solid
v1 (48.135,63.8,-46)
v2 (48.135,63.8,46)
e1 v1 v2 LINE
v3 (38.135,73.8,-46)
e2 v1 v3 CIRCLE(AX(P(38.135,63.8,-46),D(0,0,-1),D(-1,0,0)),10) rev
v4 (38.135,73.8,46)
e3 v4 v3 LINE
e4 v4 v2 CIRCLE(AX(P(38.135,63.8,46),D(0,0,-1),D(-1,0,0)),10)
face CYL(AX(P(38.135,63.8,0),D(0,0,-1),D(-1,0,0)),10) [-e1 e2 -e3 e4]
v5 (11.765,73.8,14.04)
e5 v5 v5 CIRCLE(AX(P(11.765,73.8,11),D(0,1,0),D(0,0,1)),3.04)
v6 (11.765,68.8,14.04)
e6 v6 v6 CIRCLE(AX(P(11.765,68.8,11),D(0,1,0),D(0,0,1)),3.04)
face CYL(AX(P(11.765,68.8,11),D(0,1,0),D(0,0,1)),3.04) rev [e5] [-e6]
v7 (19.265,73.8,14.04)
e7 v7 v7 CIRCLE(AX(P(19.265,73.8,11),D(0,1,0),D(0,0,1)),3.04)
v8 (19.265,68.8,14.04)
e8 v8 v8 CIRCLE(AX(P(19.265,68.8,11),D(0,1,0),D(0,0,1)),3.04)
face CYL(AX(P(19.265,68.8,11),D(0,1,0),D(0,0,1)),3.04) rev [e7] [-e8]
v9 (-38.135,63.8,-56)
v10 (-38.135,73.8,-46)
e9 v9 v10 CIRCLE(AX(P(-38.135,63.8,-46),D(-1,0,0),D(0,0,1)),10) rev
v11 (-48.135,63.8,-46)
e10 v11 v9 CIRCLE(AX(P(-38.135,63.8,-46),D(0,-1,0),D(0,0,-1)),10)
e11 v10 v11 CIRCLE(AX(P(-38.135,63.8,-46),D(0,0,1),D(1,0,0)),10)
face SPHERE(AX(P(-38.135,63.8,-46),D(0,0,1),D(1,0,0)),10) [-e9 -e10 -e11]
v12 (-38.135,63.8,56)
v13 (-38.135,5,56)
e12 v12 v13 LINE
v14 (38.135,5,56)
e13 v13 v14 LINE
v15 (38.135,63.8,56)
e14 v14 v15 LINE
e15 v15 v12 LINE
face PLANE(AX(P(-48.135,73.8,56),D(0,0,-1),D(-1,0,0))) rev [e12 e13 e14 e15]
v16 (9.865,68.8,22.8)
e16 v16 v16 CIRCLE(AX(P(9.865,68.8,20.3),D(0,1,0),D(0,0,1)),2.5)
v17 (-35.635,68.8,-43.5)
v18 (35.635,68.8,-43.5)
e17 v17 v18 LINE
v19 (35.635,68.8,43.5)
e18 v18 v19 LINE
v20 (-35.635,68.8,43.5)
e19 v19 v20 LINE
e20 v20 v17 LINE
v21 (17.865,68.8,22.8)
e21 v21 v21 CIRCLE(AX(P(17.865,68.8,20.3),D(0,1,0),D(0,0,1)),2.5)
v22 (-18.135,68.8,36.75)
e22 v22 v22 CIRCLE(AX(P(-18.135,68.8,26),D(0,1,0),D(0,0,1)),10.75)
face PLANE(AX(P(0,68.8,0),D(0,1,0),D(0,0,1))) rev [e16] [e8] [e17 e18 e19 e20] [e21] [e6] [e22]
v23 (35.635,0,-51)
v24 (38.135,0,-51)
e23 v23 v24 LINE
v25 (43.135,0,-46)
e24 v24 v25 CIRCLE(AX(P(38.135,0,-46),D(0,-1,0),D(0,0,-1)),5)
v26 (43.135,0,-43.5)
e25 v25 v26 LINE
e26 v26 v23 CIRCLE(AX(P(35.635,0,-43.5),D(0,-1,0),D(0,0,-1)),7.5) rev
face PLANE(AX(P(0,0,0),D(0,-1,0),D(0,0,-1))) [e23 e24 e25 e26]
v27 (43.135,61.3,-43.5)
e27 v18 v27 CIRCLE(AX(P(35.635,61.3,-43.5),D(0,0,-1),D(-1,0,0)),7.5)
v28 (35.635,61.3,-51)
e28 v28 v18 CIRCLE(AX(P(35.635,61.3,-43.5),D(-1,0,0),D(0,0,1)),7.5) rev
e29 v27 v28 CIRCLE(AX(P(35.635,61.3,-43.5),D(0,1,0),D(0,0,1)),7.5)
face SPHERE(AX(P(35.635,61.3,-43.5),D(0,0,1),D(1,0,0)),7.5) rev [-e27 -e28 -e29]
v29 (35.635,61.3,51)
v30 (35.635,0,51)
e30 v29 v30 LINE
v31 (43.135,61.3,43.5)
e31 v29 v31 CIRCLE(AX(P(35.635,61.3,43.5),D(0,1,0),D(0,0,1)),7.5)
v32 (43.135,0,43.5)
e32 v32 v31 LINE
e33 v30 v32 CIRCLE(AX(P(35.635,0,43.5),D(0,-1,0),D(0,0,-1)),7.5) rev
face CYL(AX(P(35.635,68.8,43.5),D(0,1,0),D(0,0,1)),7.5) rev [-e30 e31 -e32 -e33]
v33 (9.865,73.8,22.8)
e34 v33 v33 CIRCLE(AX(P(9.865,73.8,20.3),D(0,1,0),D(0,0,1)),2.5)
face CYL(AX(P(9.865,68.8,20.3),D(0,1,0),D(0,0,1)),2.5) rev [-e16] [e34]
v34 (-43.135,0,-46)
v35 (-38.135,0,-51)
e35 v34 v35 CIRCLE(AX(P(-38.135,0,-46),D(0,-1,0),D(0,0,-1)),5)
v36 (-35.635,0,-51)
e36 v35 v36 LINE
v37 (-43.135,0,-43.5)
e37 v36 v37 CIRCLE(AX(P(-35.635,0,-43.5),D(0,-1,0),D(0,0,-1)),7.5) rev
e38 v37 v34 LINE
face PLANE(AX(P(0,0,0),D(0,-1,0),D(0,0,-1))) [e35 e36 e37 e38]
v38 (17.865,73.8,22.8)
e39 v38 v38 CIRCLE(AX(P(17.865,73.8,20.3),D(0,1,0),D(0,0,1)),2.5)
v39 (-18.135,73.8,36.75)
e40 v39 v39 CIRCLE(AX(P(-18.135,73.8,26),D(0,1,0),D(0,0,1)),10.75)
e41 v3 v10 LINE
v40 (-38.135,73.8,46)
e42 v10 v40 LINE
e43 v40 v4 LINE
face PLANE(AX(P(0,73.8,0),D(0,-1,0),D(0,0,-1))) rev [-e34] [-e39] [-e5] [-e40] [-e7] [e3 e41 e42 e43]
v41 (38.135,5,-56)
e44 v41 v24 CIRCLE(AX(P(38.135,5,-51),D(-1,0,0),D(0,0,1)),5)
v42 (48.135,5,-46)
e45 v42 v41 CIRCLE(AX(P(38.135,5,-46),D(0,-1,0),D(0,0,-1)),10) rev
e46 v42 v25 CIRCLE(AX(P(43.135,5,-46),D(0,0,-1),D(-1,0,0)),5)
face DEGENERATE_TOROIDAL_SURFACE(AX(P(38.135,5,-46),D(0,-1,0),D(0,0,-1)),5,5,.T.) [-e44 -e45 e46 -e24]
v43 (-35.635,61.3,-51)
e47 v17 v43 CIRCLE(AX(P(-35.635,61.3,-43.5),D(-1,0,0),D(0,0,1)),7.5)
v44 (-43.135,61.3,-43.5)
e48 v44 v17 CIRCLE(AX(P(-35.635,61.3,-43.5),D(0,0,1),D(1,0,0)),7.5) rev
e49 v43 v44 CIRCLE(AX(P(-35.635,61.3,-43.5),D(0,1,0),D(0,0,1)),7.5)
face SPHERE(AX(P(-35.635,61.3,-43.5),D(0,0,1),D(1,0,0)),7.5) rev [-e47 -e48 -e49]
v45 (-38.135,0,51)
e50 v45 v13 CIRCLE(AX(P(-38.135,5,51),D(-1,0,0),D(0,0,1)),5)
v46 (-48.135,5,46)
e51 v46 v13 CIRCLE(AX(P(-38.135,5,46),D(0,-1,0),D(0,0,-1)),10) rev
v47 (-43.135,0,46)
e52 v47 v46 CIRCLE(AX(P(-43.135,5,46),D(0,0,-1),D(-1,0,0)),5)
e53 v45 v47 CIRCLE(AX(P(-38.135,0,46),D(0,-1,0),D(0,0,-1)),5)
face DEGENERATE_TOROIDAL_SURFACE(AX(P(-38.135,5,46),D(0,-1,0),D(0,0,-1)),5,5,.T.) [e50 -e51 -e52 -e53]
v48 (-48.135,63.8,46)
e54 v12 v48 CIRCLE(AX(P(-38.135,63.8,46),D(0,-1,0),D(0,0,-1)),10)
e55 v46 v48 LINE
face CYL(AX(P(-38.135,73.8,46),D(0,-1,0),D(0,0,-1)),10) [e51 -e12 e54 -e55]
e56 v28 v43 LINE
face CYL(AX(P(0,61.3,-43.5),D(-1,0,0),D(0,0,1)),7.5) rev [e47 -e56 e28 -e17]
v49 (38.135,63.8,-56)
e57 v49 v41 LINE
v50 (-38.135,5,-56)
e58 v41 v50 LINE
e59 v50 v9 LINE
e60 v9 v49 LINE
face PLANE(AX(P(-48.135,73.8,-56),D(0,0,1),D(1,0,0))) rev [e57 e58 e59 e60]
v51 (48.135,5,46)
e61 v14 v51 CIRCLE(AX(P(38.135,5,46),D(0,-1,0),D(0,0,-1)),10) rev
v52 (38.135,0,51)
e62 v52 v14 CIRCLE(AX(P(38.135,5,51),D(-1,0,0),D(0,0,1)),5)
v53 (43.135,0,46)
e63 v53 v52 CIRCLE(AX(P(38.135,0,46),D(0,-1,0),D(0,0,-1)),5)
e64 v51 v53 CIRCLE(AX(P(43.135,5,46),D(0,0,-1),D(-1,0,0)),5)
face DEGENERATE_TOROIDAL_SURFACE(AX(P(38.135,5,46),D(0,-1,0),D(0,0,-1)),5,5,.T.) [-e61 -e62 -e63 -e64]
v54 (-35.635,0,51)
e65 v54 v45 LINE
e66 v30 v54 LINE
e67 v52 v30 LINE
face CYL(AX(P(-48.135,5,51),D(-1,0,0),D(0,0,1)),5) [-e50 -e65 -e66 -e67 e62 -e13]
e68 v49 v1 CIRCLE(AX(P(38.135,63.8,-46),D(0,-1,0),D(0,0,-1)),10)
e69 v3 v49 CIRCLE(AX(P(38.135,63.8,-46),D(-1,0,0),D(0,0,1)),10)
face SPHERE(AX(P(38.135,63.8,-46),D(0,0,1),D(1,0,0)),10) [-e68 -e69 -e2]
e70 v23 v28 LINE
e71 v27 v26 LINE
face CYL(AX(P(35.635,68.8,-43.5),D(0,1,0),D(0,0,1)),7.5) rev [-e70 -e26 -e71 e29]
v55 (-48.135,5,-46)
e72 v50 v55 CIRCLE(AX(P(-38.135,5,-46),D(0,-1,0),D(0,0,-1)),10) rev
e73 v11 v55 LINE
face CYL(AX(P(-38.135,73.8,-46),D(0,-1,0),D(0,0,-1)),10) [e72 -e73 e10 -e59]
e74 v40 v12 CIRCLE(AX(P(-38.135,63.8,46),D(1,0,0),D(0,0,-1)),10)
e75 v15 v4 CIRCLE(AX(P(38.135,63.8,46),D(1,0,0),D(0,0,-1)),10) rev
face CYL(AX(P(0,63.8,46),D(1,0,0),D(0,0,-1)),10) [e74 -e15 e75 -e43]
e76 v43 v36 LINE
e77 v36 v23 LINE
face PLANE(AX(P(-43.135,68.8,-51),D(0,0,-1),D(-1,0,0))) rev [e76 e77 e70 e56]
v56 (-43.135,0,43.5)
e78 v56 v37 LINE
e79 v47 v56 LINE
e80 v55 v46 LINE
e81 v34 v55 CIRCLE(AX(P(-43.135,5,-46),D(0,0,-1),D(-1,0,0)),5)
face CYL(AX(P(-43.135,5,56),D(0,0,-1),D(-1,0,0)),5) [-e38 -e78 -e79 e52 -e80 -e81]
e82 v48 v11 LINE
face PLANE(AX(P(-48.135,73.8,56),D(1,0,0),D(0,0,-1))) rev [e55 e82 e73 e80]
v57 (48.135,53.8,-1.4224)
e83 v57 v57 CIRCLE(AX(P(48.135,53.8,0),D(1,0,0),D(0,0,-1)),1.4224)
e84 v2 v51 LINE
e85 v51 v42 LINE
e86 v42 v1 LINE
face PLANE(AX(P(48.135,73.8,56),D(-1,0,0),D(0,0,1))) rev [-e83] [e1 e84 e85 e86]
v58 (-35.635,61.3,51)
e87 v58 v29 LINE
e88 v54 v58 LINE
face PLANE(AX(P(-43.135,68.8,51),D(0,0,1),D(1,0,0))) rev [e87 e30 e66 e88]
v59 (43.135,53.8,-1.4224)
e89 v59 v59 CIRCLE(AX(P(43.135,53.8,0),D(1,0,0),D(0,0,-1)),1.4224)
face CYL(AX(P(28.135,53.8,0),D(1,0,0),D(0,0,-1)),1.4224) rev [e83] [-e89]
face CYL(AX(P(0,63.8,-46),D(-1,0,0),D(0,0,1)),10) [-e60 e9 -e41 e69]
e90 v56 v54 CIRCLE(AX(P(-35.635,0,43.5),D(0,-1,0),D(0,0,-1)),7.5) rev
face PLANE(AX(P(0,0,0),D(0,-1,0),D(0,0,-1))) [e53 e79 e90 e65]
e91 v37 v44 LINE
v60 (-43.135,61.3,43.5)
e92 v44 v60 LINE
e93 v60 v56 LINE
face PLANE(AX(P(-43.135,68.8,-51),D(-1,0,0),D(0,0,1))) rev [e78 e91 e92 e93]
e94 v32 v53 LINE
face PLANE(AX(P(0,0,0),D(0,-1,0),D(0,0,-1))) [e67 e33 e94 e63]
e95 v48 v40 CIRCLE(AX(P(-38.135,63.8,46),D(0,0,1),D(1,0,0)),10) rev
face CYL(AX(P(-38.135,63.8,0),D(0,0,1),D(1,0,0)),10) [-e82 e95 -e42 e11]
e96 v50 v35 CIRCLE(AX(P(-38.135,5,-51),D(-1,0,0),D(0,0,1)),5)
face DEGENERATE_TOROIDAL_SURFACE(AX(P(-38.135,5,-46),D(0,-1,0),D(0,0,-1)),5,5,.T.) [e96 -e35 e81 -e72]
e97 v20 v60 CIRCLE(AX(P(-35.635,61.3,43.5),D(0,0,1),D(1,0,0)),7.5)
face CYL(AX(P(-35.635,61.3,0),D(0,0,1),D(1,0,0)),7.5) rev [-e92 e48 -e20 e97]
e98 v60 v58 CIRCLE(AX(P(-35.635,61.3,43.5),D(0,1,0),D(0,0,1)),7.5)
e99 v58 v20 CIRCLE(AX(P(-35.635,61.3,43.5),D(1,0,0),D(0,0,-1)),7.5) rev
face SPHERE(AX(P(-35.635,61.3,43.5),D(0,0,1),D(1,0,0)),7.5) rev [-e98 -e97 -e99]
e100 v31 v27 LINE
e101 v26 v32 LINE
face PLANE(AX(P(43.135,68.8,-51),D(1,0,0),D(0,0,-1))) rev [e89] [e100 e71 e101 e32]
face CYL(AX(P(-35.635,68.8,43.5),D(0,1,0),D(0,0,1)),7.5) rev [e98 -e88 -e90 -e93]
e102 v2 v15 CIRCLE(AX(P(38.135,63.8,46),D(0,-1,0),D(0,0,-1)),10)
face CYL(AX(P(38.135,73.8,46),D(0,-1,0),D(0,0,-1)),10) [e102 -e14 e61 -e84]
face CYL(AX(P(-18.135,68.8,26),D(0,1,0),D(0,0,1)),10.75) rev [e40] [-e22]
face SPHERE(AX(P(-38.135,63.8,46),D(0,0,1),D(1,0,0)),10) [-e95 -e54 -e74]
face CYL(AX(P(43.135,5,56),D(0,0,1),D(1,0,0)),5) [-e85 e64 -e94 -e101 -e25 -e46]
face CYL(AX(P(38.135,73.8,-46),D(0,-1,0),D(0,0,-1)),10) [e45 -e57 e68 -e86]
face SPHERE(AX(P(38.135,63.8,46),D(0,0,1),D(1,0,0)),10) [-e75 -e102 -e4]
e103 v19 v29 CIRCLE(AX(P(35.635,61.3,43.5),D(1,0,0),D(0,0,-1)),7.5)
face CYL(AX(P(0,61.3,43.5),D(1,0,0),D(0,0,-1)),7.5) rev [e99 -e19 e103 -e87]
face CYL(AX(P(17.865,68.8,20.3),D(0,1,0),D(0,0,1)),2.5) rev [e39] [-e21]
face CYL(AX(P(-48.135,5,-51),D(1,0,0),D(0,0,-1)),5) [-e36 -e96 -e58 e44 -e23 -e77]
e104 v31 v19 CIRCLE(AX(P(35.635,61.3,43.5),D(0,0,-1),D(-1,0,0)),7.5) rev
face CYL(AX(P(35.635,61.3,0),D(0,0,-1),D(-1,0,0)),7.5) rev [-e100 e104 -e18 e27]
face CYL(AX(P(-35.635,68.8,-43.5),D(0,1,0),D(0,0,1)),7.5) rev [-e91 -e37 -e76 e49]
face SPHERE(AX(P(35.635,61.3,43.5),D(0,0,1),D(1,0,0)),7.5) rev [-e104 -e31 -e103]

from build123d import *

# Parameters (mm, degrees)
SKETCH1_W           = 96.27
SKETCH1_H           = 112
BOSS_EXTRUDE1_DEPTH = 73.8
SKETCH2_W           = 86.27
SKETCH2_H           = 102
CUT_EXTRUDE1_DEPTH  = 68.8
FILLET1_R           = 10
FILLET2_R           = 10
FILLET3_R           = 7.5
FILLET4_R           = 7.5
FILLET6_R           = 5
SKETCH3_R           = 3.04
CUT_EXTRUDE2_DEPTH  = 5
SKETCH4_R           = 10.75
CUT_EXTRUDE3_DEPTH  = 5
SKETCH5_R           = 2.5
CUT_EXTRUDE4_DEPTH  = 5
HOLE1_START         = 43.135
HOLE1_OUTLINE_R     = 1.4224
HOLE1_DEPTH         = 5


# Read off the part's stored shape, not the designer's step: Hole1
# Some blends are built 0.0001 mm under size
with BuildPart() as part:
    # Sketch1 → Boss-Extrude1 (new body)
    with BuildSketch(Plane(origin=(0, 0, 0), x_dir=(1, 0, 0), z_dir=(0, 1, 0))):
        Rectangle(SKETCH1_W, SKETCH1_H)
    extrude(amount=BOSS_EXTRUDE1_DEPTH)

    # Sketch2 → Cut-Extrude1 (cut)
    with BuildSketch(Plane.XZ):
        Rectangle(SKETCH2_W, SKETCH2_H)
    extrude(amount=-CUT_EXTRUDE1_DEPTH, mode=Mode.SUBTRACT)

    # Fillet1
    fillet1_edges = [part.edges().sort_by_distance(p)[0] for p in [
        (-48.135, 73.8, 0),
        (0, 73.8, 56),
        (48.135, 73.8, 0),
        (0, 73.8, -56),
    ]]
    fillet(fillet1_edges, radius=FILLET1_R)

    # Fillet2
    # the kernel refuses this fillet: 10 mm, written as the material it takes off along each edge
    with BuildSketch(Plane(origin=(38.135, 63.8, 46), x_dir=(1, 0, 0), z_dir=(0, 0, 1))) as fillet2_piece_1_section:
        Polygon((0, 0), (FILLET2_R, 0), (FILLET2_R, FILLET2_R), (0, FILLET2_R), align=None)
    fillet2_piece_1 = extrude(amount=FILLET2_R, mode=Mode.PRIVATE)
    fillet2_piece_1 = fillet2_piece_1 - Plane(origin=(38.135, 63.8, 46), x_dir=(-0.7071067811865475, -0.7071067811865475, 0), z_dir=(0, 0, 1)) * Sphere(FILLET2_R, mode=Mode.PRIVATE)
    add(fillet2_piece_1, mode=Mode.SUBTRACT)
    with BuildSketch(Plane(origin=(-38.135, 63.8, 46), x_dir=(-1, 0, 0), z_dir=(0, 0, 1))) as fillet2_piece_2_section:
        Polygon((0, 0), (FILLET2_R, 0), (FILLET2_R, -FILLET2_R), (0, -FILLET2_R), align=None)
    fillet2_piece_2 = extrude(amount=FILLET2_R, mode=Mode.PRIVATE)
    fillet2_piece_2 = fillet2_piece_2 - Plane(origin=(-38.135, 63.8, 46), x_dir=(0.7071067811865475, -0.7071067811865475, 0), z_dir=(0, 0, 1)) * Sphere(FILLET2_R, mode=Mode.PRIVATE)
    add(fillet2_piece_2, mode=Mode.SUBTRACT)
    with BuildSketch(Plane(origin=(38.135, 63.8, -46), x_dir=(0, 0, -1), z_dir=(1, 0, 0))) as fillet2_piece_3_section:
        Polygon((0, 0), (FILLET2_R, 0), (FILLET2_R, FILLET2_R), (0, FILLET2_R), align=None)
    fillet2_piece_3 = extrude(amount=FILLET2_R, mode=Mode.PRIVATE)
    fillet2_piece_3 = fillet2_piece_3 - Plane(origin=(38.135, 63.8, -46), x_dir=(0, -0.7071067811865475, 0.7071067811865475), z_dir=(1, 0, 0)) * Sphere(FILLET2_R, mode=Mode.PRIVATE)
    add(fillet2_piece_3, mode=Mode.SUBTRACT)
    with BuildSketch(Plane(origin=(-38.135, 63.8, -46), x_dir=(0, 0, -1), z_dir=(-1, 0, 0))) as fillet2_piece_4_section:
        Polygon((0, 0), (FILLET2_R, 0), (FILLET2_R, -FILLET2_R), (0, -FILLET2_R), align=None)
    fillet2_piece_4 = extrude(amount=FILLET2_R, mode=Mode.PRIVATE)
    fillet2_piece_4 = fillet2_piece_4 - Plane(origin=(-38.135, 63.8, -46), x_dir=(0, -0.7071067811865475, 0.7071067811865475), z_dir=(-1, 0, 0)) * Sphere(FILLET2_R, mode=Mode.PRIVATE)
    add(fillet2_piece_4, mode=Mode.SUBTRACT)
    with BuildSketch(Plane(origin=(-48.135, -25, -56), x_dir=(0, 0, 1), z_dir=(0, 1, 0)), Plane(origin=(-48.135, -25, 56), x_dir=(1, 0, 0), z_dir=(0, 1, 0))) as fillet2_piece_5:
        with BuildLine():
            CenterArc((FILLET2_R, FILLET2_R), FILLET2_R, 180, 90)
            Line((0, FILLET2_R), (0, 0))
            Line((0, 0), (FILLET2_R, 0))
        make_face()
    extrude(amount=88.8, mode=Mode.SUBTRACT)
    with BuildSketch(Plane(origin=(48.135, -25, -56), x_dir=(0, 0, 1), z_dir=(0, 1, 0)), Plane(origin=(48.135, -25, 56), x_dir=(-1, 0, 0), z_dir=(0, 1, 0))) as fillet2_piece_6:
        with BuildLine():
            CenterArc((FILLET2_R, -FILLET2_R), FILLET2_R, 90, 90)
            Line((0, -FILLET2_R), (0, 0))
            Line((0, 0), (FILLET2_R, 0))
        make_face()
    extrude(amount=88.8, mode=Mode.SUBTRACT)

    # Fillet3
    fillet3_edges = [part.edges().sort_by_distance(p)[0] for p in [
        (43.135, 68.8, 0),
        (0, 68.8, -51),
        (-43.135, 68.8, 0),
        (0, 68.8, 51),
    ]]
    fillet(fillet3_edges, radius=FILLET3_R)

    # Fillet4
    # the kernel refuses this fillet: 7.5 mm, written as the material it adds along each edge
    with BuildSketch(Plane(origin=(-35.635, 61.3, -43.5), x_dir=(0, 0, -1), z_dir=(-1, 0, 0))) as fillet4_piece_1_section:
        Polygon((0, 0), (FILLET4_R, 0), (FILLET4_R, -FILLET4_R), (0, -FILLET4_R), align=None)
    fillet4_piece_1 = extrude(amount=FILLET4_R, mode=Mode.PRIVATE)
    fillet4_piece_1 = fillet4_piece_1 - Plane(origin=(-35.635, 61.3, -43.5), x_dir=(0, -0.7071067811865475, 0.7071067811865475), z_dir=(-1, 0, 0)) * Sphere(FILLET4_R, mode=Mode.PRIVATE)
    add(fillet4_piece_1)
    with BuildSketch(Plane(origin=(-35.635, 61.3, 43.5), x_dir=(0, 0, 1), z_dir=(-1, 0, 0))) as fillet4_piece_2_section:
        Polygon((0, 0), (FILLET4_R, 0), (FILLET4_R, FILLET4_R), (0, FILLET4_R), align=None)
    fillet4_piece_2 = extrude(amount=FILLET4_R, mode=Mode.PRIVATE)
    fillet4_piece_2 = fillet4_piece_2 - Plane(origin=(-35.635, 61.3, 43.5), x_dir=(0, -0.7071067811865475, -0.7071067811865475), z_dir=(-1, 0, 0)) * Sphere(FILLET4_R, mode=Mode.PRIVATE)
    add(fillet4_piece_2)
    with BuildSketch(Plane(origin=(35.635, 61.3, -43.5), x_dir=(1, 0, 0), z_dir=(0, 0, -1))) as fillet4_piece_3_section:
        Polygon((0, 0), (FILLET4_R, 0), (FILLET4_R, -FILLET4_R), (0, -FILLET4_R), align=None)
    fillet4_piece_3 = extrude(amount=FILLET4_R, mode=Mode.PRIVATE)
    fillet4_piece_3 = fillet4_piece_3 - Plane(origin=(35.635, 61.3, -43.5), x_dir=(-0.7071067811865475, -0.7071067811865475, 0), z_dir=(0, 0, -1)) * Sphere(FILLET4_R, mode=Mode.PRIVATE)
    add(fillet4_piece_3)
    with BuildSketch(Plane(origin=(35.635, 61.3, 43.5), x_dir=(1, 0, 0), z_dir=(0, 0, 1))) as fillet4_piece_4_section:
        Polygon((0, 0), (FILLET4_R, 0), (FILLET4_R, FILLET4_R), (0, FILLET4_R), align=None)
    fillet4_piece_4 = extrude(amount=FILLET4_R, mode=Mode.PRIVATE)
    fillet4_piece_4 = fillet4_piece_4 - Plane(origin=(35.635, 61.3, 43.5), x_dir=(-0.7071067811865475, -0.7071067811865475, 0), z_dir=(0, 0, 1)) * Sphere(FILLET4_R, mode=Mode.PRIVATE)
    add(fillet4_piece_4)
    with BuildSketch(Plane(origin=(43.135, 0, 51), x_dir=(-1, 0, 0), z_dir=(0, 1, 0)), Plane(origin=(-43.135, 0, 51), x_dir=(0, 0, -1), z_dir=(0, 1, 0))) as fillet4_piece_5:
        with BuildLine():
            CenterArc((FILLET4_R, -FILLET4_R), FILLET4_R, 90, 90)
            Line((0, -FILLET4_R), (0, 0))
            Line((0, 0), (FILLET4_R, 0))
        make_face()
    extrude(amount=61.3)
    with BuildSketch(Plane(origin=(43.135, 0, -51), x_dir=(-1, 0, 0), z_dir=(0, 1, 0)), Plane(origin=(-43.135, 0, -51), x_dir=(0, 0, 1), z_dir=(0, 1, 0))) as fillet4_piece_6:
        with BuildLine():
            CenterArc((FILLET4_R, FILLET4_R), FILLET4_R, 180, 90)
            Line((0, FILLET4_R), (0, 0))
            Line((0, 0), (FILLET4_R, 0))
        make_face()
    extrude(amount=61.3)

    # Fillet6
    fillet6_edges = [part.edges().sort_by_distance(p)[0] for p in [
        (-48.135, 0, 0),
        (48.135, 0, 0),
        (0, 0, 56),
        (0, 0, -56),
        (-45.206067812, 0, 53.071067812),
        (45.206067812, 0, 53.071067812),
        (45.206067812, 0, -53.071067812),
        (-45.206067812, 0, -53.071067812),
    ]]
    fillet(fillet6_edges, radius=FILLET6_R - 0.0001)  # a hair under: the kernel refuses the full size

    # Sketch3 → Cut-Extrude2 (cut)
    with BuildSketch(Plane(origin=(0, 73.8, 0), x_dir=(1, 0, 0), z_dir=(0, 1, 0))):
        with Locations(Location((19.265, -11, 0), (0, 0, 270))):
            Circle(SKETCH3_R)
        with Locations(Location((11.765, -11, 0), (0, 0, 270))):
            Circle(SKETCH3_R)
    extrude(amount=-CUT_EXTRUDE2_DEPTH, mode=Mode.SUBTRACT)

    # Sketch4 → Cut-Extrude3 (cut)
    with BuildSketch(Plane(origin=(0, 73.8, 0), x_dir=(1, 0, 0), z_dir=(0, 1, 0))):
        with Locations(Location((-18.135, -26, 0), (0, 0, 270))):
            Circle(SKETCH4_R)
    extrude(amount=-CUT_EXTRUDE3_DEPTH, mode=Mode.SUBTRACT)

    # Sketch5 → Cut-Extrude4 (cut)
    with BuildSketch(Plane(origin=(0, 73.8, 0), x_dir=(1, 0, 0), z_dir=(0, 1, 0))):
        with Locations(Location((9.865, -20.3, 0), (0, 0, 270))):
            Circle(SKETCH5_R)
        with Locations(Location((17.865, -20.3, 0), (0, 0, 270))):
            Circle(SKETCH5_R)
    extrude(amount=-CUT_EXTRUDE4_DEPTH, mode=Mode.SUBTRACT)

    # Hole1 outline → Hole1 (cut)
    with BuildSketch(Plane.YZ.offset(HOLE1_START)):
        with Locations((53.8, 0)):
            Circle(HOLE1_OUTLINE_R)
    extrude(amount=HOLE1_DEPTH, mode=Mode.SUBTRACT)


solid = part.part
